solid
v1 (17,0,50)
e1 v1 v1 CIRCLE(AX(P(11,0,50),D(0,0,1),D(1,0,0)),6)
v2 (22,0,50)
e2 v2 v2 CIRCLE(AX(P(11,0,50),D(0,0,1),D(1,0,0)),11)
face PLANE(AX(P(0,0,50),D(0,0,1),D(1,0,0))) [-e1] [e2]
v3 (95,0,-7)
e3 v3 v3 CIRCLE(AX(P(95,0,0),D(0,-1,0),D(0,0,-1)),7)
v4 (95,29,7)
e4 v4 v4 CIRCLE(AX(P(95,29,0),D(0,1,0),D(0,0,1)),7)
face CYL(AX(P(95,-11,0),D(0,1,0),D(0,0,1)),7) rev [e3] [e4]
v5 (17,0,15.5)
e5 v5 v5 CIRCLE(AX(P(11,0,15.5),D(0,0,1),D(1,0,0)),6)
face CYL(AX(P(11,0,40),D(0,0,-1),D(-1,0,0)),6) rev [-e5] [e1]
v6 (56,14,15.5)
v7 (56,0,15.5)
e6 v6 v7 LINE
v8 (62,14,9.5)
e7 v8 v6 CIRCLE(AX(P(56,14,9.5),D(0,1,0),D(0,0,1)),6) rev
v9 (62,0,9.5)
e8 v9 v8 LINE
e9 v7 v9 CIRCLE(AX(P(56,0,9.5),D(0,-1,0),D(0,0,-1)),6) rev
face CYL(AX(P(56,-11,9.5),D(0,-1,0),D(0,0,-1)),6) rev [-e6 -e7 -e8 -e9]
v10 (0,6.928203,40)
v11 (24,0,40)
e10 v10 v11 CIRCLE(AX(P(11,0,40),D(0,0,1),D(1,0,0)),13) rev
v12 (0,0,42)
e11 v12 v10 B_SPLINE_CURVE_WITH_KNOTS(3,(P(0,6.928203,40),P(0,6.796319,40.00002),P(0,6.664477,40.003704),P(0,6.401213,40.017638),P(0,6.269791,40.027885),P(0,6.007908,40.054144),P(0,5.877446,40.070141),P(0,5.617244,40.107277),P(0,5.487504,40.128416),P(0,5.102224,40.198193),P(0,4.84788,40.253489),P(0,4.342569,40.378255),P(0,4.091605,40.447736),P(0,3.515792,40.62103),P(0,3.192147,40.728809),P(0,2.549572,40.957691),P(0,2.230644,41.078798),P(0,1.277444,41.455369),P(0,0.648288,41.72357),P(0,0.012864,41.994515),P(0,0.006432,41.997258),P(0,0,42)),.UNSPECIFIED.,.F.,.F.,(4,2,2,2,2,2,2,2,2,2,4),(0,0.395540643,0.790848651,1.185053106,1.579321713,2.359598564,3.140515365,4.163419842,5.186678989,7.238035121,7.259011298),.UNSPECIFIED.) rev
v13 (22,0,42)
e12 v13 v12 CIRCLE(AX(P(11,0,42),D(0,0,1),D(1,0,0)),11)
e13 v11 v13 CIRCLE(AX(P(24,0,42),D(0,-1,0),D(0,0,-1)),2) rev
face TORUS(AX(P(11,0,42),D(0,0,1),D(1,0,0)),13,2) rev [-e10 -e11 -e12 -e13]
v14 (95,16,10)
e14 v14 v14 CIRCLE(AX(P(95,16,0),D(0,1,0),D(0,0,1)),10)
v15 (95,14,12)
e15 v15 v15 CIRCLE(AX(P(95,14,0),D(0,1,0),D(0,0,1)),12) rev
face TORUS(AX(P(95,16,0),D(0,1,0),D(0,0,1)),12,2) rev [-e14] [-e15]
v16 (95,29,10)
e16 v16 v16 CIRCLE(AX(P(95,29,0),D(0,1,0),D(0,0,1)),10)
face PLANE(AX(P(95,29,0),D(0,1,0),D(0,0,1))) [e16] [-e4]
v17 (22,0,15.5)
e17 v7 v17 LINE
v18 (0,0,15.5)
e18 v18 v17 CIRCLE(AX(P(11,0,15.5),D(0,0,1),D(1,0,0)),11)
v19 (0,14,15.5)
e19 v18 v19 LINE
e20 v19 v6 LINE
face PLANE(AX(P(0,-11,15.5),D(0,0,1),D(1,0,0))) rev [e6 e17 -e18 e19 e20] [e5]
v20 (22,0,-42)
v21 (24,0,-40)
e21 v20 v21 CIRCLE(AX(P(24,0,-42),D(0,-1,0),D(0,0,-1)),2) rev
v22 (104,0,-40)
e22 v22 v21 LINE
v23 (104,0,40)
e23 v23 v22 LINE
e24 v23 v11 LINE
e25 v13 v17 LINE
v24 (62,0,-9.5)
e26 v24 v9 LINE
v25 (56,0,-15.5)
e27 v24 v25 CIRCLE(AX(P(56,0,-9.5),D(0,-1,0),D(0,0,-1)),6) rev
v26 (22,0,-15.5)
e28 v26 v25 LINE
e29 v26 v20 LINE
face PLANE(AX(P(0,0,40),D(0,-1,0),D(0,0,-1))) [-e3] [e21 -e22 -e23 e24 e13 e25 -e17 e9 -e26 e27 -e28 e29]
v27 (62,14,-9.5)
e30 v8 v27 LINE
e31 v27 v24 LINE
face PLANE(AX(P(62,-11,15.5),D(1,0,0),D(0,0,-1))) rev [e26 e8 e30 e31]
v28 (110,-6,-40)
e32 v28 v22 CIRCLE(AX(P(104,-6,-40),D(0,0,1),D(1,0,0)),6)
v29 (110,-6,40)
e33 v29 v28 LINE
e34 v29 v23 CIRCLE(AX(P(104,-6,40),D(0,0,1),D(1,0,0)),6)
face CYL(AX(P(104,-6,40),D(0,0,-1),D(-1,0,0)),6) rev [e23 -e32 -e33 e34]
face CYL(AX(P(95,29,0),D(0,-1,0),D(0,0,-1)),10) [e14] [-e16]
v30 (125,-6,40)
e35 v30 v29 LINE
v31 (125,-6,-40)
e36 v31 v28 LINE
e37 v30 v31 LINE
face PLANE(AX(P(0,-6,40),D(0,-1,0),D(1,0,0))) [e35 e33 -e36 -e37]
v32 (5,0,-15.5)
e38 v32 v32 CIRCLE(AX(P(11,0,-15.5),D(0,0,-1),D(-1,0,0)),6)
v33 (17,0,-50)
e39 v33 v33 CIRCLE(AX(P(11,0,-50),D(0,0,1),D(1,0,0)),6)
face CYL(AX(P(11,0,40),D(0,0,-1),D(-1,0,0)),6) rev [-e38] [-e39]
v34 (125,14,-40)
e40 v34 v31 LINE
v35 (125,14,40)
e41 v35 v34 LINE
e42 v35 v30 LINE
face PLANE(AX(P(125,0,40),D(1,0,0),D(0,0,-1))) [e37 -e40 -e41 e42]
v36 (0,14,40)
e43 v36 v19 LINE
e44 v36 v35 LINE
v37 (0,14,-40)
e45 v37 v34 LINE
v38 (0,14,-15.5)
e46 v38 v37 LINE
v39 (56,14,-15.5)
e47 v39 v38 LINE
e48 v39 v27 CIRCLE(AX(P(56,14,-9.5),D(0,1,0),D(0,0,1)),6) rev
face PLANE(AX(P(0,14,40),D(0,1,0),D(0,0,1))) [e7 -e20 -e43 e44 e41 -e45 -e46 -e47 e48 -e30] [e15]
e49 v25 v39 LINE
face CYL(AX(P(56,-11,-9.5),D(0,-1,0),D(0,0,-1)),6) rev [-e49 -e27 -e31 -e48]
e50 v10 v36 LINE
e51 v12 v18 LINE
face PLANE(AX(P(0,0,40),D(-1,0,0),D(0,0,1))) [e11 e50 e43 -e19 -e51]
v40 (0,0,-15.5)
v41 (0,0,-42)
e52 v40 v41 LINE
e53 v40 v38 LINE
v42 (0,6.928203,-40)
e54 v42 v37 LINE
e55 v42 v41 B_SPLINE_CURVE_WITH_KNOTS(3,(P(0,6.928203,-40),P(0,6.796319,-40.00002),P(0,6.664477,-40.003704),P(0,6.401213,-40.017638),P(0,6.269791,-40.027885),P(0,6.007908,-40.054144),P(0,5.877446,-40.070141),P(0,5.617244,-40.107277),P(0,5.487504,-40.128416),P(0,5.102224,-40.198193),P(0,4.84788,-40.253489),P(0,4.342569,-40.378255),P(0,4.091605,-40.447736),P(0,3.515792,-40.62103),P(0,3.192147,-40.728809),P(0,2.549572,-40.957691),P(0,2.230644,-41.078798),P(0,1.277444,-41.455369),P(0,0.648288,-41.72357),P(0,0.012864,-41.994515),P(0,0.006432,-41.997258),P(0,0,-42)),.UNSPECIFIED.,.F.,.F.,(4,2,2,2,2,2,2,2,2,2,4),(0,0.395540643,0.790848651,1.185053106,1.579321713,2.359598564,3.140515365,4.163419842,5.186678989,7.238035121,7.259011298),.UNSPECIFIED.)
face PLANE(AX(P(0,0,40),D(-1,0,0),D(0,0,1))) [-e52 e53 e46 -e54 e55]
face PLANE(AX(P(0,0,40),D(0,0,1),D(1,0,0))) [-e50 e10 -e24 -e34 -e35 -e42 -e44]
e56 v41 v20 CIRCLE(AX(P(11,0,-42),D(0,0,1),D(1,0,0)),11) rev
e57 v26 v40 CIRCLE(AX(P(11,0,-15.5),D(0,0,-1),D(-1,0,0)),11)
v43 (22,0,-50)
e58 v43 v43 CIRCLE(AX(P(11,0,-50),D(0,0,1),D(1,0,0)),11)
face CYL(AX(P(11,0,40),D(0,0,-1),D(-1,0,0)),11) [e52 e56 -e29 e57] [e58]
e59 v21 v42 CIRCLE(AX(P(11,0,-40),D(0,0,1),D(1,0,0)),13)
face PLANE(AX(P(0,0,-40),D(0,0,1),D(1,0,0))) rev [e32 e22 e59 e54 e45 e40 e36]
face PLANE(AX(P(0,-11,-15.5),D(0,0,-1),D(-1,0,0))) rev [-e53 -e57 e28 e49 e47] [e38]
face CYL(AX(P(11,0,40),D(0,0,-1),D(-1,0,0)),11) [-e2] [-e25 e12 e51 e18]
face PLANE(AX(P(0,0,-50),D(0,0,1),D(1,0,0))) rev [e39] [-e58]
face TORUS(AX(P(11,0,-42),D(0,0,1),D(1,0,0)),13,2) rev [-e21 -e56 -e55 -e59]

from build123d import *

# Parameters (mm, degrees)
SKETCH1_R           = 6
BOSS_EXTRUDE1_DEPTH = 40
BOSS_EXTRUDE2_DEPTH = 50
SKETCH2_W           = 62
SKETCH2_H           = 31
CUT_EXTRUDE1_DEPTH  = 137.930639376
SKETCH3_R           = 7
CUT_EXTRUDE2_DEPTH  = 137.930639376
BOSS_EXTRUDE3_START = 15
SKETCH3_3_R         = 10
SKETCH3_3_R_2       = 7
BOSS_EXTRUDE3_DEPTH = 15
FILLET1_R           = 6
FILLET2_R           = 2


with BuildPart() as part:
    # Sketch1 → Boss-Extrude1 (new, symmetric)
    with BuildSketch(Plane.XY):
        with BuildLine():
            Line((22, 0), (104, 0))
            ThreePointArc((104, 0), (108.242640687, -1.757359313), (110, -6))
            Line((110, -6), (125, -6))
            Line((125, -6), (125, 14))
            Line((125, 14), (0, 14))
            Line((0, 14), (0, 0))
            ThreePointArc((0, 0), (11, -11), (22, 0))
        make_face()
        with Locations((11, 0)):
            Circle(SKETCH1_R, mode=Mode.SUBTRACT)
    extrude(amount=BOSS_EXTRUDE1_DEPTH, both=True)

    # Sketch1<3> → Boss-Extrude2 (add, symmetric)
    with BuildSketch(Plane.XY):
        with BuildLine():
            ThreePointArc((22, 0), (11, 11), (0, 0))
            Line((0, 0), (5, 0))
            ThreePointArc((5, 0), (11, 6), (17, 0))
            Line((17, 0), (22, 0))
        make_face()
        with BuildLine():
            Line((5, 0), (0, 0))
            ThreePointArc((0, 0), (11, -11), (22, 0))
            Line((22, 0), (17, 0))
            ThreePointArc((17, 0), (11, -6), (5, 0))
        make_face()
    extrude(amount=BOSS_EXTRUDE2_DEPTH, both=True)

    # Sketch2 → Cut-Extrude1 (cut, through all)
    with BuildSketch(Plane(origin=(0, 14, 0), x_dir=(1, 0, 0), z_dir=(0, 1, 0))):
        with Locations((31, 0)):
            Rectangle(SKETCH2_W, SKETCH2_H)
    extrude(amount=-CUT_EXTRUDE1_DEPTH, mode=Mode.SUBTRACT)

    # Sketch3 → Cut-Extrude2 (cut, through all)
    with BuildSketch(Plane(origin=(0, 14, 0), x_dir=(1, 0, 0), z_dir=(0, 1, 0))):
        with Locations(Location((95, 0, 0), (0, 0, 270))):
            Circle(SKETCH3_R)
    extrude(amount=-CUT_EXTRUDE2_DEPTH, mode=Mode.SUBTRACT)

    # Sketch3<3> → Boss-Extrude3 (add)
    with BuildSketch(Plane(origin=(0, 14, 0), x_dir=(1, 0, 0), z_dir=(0, 1, 0)).offset(BOSS_EXTRUDE3_START)):
        with Locations(Location((95, 0, 0), (0, 0, 270))):
            Circle(SKETCH3_3_R)
        with Locations(Location((95, 0, 0), (0, 0, 270))):
            Circle(SKETCH3_3_R_2, mode=Mode.SUBTRACT)
    extrude(amount=-BOSS_EXTRUDE3_DEPTH)

    # Fillet1
    fillet1_edges = [part.edges().sort_by_distance(p)[0] for p in [
        (62, 7, 15.5),
        (62, 7, -15.5),
    ]]
    fillet(fillet1_edges, radius=FILLET1_R)

    # Fillet2
    # the kernel refuses this fillet: 2 mm, written as the material it adds along each edge
    with BuildSketch(Plane(origin=(11, 0, -40), x_dir=(1, 0, 0), z_dir=(0, -1, 0))) as fillet2_piece_1_section:
        with BuildLine():
            CenterArc((11 + FILLET2_R, -FILLET2_R), FILLET2_R, 90, 90)
            Line((11 + FILLET2_R, 0), (11, 0))
            Line((11, 0), (11, -FILLET2_R))
        make_face()
    fillet2_piece_1 = revolve(axis=Axis((11, 0, -40), (0, 0, 1)), revolution_arc=180, mode=Mode.PRIVATE)
    fillet2_piece_1 = split(fillet2_piece_1, bisect_by=Plane(origin=(0, 11.564222142, -40.564222142), z_dir=(1, 0, 0)), keep=Keep.TOP, mode=Mode.PRIVATE)
    add(fillet2_piece_1)
    with BuildSketch(Plane(origin=(11, 0, 40), x_dir=(1, 0, 0), z_dir=(0, -1, 0))) as fillet2_piece_2_section:
        with BuildLine():
            CenterArc((11 + FILLET2_R, FILLET2_R), FILLET2_R, 180, 90)
            Line((11, FILLET2_R), (11, 0))
            Line((11, 0), (11 + FILLET2_R, 0))
        make_face()
    fillet2_piece_2 = revolve(axis=Axis((11, 0, 40), (0, 0, 1)), revolution_arc=180, mode=Mode.PRIVATE)
    fillet2_piece_2 = split(fillet2_piece_2, bisect_by=Plane(origin=(0, 11.564222139, 40.564222139), z_dir=(1, 0, 0)), keep=Keep.TOP, mode=Mode.PRIVATE)
    add(fillet2_piece_2)
    with BuildSketch(Plane(origin=(95, 14, 0), x_dir=(0, 0, 1), z_dir=(-1, 0, 0))) as fillet2_piece_3:
        with BuildLine():
            CenterArc((10 + FILLET2_R, FILLET2_R), FILLET2_R, 180, 90)
            Line((10, FILLET2_R), (10, 0))
            Line((10, 0), (10 + FILLET2_R, 0))
        make_face()
    revolve(axis=Axis((95, 14, 0), (0, 1, 0)))


solid = part.part
